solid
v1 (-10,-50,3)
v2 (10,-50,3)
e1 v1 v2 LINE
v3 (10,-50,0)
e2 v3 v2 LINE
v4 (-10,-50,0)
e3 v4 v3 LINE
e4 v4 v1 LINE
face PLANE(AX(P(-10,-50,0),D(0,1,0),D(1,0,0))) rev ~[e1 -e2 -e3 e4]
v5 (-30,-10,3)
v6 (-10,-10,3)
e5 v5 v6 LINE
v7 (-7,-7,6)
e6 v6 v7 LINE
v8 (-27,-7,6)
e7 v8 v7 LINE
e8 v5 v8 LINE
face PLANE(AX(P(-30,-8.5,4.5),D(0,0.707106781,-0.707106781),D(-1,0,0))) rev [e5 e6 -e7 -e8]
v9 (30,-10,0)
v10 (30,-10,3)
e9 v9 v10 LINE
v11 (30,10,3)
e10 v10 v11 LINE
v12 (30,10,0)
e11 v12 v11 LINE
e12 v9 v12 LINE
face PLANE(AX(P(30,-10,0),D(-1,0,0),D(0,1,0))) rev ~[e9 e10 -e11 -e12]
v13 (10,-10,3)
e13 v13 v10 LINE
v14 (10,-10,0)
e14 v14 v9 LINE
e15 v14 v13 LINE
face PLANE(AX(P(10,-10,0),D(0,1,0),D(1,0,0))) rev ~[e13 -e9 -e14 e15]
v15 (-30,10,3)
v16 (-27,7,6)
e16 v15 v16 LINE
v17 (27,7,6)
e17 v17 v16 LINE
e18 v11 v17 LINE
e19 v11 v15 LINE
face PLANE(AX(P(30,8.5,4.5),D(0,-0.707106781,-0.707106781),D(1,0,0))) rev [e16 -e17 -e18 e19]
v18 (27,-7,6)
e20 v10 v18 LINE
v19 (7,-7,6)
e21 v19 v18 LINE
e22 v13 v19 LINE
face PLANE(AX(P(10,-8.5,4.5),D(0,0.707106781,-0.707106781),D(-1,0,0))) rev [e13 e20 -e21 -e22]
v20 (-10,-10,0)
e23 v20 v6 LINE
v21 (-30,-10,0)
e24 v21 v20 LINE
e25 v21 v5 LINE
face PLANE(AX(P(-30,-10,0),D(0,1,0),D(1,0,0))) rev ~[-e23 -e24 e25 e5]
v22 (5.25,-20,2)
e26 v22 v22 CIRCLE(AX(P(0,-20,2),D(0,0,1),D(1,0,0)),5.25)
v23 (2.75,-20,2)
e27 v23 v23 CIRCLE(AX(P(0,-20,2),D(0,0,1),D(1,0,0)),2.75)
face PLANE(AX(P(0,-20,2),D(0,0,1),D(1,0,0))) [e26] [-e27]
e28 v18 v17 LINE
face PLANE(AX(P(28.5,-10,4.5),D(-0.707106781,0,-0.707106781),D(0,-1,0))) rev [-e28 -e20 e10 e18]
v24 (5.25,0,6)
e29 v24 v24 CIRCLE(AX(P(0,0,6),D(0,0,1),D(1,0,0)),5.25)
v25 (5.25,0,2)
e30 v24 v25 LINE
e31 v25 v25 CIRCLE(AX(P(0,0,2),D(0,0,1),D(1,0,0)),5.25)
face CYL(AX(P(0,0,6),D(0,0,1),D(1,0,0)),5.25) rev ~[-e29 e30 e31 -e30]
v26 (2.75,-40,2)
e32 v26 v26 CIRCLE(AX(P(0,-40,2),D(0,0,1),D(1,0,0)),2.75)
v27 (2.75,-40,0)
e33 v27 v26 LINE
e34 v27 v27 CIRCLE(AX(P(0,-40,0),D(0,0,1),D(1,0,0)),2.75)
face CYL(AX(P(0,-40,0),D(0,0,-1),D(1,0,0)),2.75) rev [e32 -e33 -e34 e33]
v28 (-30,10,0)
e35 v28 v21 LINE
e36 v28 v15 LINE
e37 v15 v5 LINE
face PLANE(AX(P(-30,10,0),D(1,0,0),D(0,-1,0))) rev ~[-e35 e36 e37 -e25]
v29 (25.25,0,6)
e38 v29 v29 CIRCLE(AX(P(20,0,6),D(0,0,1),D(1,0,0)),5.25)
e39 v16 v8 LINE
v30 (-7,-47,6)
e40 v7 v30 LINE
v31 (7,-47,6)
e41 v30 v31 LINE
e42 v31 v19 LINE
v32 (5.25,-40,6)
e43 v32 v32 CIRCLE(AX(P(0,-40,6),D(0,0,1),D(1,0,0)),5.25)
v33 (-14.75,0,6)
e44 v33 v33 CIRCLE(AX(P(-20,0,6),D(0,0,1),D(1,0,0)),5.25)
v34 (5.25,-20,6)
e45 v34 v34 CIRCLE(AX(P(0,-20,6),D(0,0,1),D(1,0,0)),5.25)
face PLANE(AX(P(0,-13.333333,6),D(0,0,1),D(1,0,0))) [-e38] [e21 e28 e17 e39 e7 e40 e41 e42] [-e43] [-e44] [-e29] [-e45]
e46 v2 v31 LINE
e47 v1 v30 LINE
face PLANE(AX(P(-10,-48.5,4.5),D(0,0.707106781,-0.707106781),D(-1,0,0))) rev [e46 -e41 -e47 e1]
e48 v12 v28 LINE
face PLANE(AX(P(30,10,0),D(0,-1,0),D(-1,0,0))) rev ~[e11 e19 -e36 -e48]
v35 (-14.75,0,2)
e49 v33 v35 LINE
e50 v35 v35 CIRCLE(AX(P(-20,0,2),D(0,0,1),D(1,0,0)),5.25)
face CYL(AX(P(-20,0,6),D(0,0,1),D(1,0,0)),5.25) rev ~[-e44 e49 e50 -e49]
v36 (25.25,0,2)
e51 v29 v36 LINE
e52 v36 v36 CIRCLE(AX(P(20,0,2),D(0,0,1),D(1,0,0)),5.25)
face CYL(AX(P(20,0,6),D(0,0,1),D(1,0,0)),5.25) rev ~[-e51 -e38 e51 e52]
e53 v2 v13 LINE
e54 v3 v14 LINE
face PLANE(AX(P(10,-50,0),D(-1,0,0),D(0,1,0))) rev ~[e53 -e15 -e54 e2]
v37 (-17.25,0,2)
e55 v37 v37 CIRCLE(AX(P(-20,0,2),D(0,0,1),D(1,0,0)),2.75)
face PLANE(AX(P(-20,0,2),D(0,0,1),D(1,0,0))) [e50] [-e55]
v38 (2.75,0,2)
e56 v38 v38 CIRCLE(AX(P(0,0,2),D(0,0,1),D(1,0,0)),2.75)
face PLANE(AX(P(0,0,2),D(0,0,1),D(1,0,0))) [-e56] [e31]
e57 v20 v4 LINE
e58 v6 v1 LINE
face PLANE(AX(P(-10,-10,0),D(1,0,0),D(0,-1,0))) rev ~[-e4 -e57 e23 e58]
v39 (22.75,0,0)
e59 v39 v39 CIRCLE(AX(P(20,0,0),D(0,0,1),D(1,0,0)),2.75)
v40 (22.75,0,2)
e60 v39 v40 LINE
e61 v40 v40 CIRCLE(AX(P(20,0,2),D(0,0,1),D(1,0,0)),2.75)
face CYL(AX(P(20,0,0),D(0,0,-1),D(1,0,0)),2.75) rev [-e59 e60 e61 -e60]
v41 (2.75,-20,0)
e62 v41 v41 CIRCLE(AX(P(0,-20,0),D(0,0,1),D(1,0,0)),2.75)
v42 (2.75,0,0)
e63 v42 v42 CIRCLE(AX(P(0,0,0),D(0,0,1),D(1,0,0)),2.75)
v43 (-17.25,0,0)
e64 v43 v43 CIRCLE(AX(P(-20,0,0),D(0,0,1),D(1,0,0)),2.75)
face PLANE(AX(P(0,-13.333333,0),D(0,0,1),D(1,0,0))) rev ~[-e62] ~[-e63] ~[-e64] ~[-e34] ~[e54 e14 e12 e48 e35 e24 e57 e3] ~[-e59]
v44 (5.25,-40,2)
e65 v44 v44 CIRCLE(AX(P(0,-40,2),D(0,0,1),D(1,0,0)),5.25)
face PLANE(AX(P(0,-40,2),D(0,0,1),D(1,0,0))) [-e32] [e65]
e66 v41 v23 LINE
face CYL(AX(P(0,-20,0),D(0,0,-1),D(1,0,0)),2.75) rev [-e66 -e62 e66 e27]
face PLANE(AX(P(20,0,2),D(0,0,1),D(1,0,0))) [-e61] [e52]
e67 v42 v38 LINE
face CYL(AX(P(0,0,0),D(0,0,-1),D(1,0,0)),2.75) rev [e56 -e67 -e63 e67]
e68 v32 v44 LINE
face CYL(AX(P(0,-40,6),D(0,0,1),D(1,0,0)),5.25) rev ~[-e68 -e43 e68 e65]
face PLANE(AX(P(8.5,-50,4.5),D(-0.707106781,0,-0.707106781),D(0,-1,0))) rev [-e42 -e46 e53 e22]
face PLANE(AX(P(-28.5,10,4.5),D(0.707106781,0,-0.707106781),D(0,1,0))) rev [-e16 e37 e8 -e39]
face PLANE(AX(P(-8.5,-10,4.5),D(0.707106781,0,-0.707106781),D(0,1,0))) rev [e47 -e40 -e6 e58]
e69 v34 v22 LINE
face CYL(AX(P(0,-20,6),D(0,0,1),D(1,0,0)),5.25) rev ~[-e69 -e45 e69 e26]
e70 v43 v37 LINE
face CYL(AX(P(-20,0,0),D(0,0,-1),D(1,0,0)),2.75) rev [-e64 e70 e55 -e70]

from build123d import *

# Parameters (mm, degrees)
F2_R     = 2.75
F3_DEPTH = 6
F4_SIZE  = 3
F5_R     = 5.25
F5_R_2   = 2.75
F6_DEPTH = 4


with BuildPart() as f3:
    # F2 (on Top) → F3 (new body)
    with BuildSketch(Plane.XY):
        Polygon((-10, -50), (0, -50), (10, -50), (10, -10), (30, -10), (30, 10), (0, 10), (-30, 10), (-30, -10), (-10, -10), align=None)
        with Locations((0, -40)):
            Circle(F2_R, mode=Mode.SUBTRACT)
        with Locations((-20, 0)):
            Circle(F2_R, mode=Mode.SUBTRACT)
        with Locations((0, -20)):
            Circle(F2_R, mode=Mode.SUBTRACT)
        Circle(F2_R, mode=Mode.SUBTRACT)
        with Locations((20, 0)):
            Circle(F2_R, mode=Mode.SUBTRACT)
    extrude(amount=F3_DEPTH)

    # F4
    f4_edges = [f3.edges().sort_by_distance(p)[0] for p in [
        (0, -50, 6),
        (10, -30, 6),
        (20, -10, 6),
        (30, 0, 6),
        (0, 10, 6),
        (-30, 0, 6),
        (-20, -10, 6),
        (-10, -30, 6),
    ]]
    chamfer(f4_edges, length=F4_SIZE)

    # F5 (on face) → F6 (cut)
    with BuildSketch(Plane.XY.offset(6)):
        with Locations((-20, 0)):
            Circle(F5_R)
        with Locations((-20, 0)):
            Circle(F5_R_2, mode=Mode.SUBTRACT)
        Circle(F5_R)
        Circle(F5_R_2, mode=Mode.SUBTRACT)
        with Locations((20, 0)):
            Circle(F5_R)
        with Locations((20, 0)):
            Circle(F5_R_2, mode=Mode.SUBTRACT)
        with Locations((0, -20)):
            Circle(F5_R)
        with Locations((0, -20)):
            Circle(F5_R_2, mode=Mode.SUBTRACT)
        with Locations((0, -40)):
            Circle(F5_R)
        with Locations((0, -40)):
            Circle(F5_R_2, mode=Mode.SUBTRACT)
    extrude(amount=-F6_DEPTH, mode=Mode.SUBTRACT)


solid = f3.part
